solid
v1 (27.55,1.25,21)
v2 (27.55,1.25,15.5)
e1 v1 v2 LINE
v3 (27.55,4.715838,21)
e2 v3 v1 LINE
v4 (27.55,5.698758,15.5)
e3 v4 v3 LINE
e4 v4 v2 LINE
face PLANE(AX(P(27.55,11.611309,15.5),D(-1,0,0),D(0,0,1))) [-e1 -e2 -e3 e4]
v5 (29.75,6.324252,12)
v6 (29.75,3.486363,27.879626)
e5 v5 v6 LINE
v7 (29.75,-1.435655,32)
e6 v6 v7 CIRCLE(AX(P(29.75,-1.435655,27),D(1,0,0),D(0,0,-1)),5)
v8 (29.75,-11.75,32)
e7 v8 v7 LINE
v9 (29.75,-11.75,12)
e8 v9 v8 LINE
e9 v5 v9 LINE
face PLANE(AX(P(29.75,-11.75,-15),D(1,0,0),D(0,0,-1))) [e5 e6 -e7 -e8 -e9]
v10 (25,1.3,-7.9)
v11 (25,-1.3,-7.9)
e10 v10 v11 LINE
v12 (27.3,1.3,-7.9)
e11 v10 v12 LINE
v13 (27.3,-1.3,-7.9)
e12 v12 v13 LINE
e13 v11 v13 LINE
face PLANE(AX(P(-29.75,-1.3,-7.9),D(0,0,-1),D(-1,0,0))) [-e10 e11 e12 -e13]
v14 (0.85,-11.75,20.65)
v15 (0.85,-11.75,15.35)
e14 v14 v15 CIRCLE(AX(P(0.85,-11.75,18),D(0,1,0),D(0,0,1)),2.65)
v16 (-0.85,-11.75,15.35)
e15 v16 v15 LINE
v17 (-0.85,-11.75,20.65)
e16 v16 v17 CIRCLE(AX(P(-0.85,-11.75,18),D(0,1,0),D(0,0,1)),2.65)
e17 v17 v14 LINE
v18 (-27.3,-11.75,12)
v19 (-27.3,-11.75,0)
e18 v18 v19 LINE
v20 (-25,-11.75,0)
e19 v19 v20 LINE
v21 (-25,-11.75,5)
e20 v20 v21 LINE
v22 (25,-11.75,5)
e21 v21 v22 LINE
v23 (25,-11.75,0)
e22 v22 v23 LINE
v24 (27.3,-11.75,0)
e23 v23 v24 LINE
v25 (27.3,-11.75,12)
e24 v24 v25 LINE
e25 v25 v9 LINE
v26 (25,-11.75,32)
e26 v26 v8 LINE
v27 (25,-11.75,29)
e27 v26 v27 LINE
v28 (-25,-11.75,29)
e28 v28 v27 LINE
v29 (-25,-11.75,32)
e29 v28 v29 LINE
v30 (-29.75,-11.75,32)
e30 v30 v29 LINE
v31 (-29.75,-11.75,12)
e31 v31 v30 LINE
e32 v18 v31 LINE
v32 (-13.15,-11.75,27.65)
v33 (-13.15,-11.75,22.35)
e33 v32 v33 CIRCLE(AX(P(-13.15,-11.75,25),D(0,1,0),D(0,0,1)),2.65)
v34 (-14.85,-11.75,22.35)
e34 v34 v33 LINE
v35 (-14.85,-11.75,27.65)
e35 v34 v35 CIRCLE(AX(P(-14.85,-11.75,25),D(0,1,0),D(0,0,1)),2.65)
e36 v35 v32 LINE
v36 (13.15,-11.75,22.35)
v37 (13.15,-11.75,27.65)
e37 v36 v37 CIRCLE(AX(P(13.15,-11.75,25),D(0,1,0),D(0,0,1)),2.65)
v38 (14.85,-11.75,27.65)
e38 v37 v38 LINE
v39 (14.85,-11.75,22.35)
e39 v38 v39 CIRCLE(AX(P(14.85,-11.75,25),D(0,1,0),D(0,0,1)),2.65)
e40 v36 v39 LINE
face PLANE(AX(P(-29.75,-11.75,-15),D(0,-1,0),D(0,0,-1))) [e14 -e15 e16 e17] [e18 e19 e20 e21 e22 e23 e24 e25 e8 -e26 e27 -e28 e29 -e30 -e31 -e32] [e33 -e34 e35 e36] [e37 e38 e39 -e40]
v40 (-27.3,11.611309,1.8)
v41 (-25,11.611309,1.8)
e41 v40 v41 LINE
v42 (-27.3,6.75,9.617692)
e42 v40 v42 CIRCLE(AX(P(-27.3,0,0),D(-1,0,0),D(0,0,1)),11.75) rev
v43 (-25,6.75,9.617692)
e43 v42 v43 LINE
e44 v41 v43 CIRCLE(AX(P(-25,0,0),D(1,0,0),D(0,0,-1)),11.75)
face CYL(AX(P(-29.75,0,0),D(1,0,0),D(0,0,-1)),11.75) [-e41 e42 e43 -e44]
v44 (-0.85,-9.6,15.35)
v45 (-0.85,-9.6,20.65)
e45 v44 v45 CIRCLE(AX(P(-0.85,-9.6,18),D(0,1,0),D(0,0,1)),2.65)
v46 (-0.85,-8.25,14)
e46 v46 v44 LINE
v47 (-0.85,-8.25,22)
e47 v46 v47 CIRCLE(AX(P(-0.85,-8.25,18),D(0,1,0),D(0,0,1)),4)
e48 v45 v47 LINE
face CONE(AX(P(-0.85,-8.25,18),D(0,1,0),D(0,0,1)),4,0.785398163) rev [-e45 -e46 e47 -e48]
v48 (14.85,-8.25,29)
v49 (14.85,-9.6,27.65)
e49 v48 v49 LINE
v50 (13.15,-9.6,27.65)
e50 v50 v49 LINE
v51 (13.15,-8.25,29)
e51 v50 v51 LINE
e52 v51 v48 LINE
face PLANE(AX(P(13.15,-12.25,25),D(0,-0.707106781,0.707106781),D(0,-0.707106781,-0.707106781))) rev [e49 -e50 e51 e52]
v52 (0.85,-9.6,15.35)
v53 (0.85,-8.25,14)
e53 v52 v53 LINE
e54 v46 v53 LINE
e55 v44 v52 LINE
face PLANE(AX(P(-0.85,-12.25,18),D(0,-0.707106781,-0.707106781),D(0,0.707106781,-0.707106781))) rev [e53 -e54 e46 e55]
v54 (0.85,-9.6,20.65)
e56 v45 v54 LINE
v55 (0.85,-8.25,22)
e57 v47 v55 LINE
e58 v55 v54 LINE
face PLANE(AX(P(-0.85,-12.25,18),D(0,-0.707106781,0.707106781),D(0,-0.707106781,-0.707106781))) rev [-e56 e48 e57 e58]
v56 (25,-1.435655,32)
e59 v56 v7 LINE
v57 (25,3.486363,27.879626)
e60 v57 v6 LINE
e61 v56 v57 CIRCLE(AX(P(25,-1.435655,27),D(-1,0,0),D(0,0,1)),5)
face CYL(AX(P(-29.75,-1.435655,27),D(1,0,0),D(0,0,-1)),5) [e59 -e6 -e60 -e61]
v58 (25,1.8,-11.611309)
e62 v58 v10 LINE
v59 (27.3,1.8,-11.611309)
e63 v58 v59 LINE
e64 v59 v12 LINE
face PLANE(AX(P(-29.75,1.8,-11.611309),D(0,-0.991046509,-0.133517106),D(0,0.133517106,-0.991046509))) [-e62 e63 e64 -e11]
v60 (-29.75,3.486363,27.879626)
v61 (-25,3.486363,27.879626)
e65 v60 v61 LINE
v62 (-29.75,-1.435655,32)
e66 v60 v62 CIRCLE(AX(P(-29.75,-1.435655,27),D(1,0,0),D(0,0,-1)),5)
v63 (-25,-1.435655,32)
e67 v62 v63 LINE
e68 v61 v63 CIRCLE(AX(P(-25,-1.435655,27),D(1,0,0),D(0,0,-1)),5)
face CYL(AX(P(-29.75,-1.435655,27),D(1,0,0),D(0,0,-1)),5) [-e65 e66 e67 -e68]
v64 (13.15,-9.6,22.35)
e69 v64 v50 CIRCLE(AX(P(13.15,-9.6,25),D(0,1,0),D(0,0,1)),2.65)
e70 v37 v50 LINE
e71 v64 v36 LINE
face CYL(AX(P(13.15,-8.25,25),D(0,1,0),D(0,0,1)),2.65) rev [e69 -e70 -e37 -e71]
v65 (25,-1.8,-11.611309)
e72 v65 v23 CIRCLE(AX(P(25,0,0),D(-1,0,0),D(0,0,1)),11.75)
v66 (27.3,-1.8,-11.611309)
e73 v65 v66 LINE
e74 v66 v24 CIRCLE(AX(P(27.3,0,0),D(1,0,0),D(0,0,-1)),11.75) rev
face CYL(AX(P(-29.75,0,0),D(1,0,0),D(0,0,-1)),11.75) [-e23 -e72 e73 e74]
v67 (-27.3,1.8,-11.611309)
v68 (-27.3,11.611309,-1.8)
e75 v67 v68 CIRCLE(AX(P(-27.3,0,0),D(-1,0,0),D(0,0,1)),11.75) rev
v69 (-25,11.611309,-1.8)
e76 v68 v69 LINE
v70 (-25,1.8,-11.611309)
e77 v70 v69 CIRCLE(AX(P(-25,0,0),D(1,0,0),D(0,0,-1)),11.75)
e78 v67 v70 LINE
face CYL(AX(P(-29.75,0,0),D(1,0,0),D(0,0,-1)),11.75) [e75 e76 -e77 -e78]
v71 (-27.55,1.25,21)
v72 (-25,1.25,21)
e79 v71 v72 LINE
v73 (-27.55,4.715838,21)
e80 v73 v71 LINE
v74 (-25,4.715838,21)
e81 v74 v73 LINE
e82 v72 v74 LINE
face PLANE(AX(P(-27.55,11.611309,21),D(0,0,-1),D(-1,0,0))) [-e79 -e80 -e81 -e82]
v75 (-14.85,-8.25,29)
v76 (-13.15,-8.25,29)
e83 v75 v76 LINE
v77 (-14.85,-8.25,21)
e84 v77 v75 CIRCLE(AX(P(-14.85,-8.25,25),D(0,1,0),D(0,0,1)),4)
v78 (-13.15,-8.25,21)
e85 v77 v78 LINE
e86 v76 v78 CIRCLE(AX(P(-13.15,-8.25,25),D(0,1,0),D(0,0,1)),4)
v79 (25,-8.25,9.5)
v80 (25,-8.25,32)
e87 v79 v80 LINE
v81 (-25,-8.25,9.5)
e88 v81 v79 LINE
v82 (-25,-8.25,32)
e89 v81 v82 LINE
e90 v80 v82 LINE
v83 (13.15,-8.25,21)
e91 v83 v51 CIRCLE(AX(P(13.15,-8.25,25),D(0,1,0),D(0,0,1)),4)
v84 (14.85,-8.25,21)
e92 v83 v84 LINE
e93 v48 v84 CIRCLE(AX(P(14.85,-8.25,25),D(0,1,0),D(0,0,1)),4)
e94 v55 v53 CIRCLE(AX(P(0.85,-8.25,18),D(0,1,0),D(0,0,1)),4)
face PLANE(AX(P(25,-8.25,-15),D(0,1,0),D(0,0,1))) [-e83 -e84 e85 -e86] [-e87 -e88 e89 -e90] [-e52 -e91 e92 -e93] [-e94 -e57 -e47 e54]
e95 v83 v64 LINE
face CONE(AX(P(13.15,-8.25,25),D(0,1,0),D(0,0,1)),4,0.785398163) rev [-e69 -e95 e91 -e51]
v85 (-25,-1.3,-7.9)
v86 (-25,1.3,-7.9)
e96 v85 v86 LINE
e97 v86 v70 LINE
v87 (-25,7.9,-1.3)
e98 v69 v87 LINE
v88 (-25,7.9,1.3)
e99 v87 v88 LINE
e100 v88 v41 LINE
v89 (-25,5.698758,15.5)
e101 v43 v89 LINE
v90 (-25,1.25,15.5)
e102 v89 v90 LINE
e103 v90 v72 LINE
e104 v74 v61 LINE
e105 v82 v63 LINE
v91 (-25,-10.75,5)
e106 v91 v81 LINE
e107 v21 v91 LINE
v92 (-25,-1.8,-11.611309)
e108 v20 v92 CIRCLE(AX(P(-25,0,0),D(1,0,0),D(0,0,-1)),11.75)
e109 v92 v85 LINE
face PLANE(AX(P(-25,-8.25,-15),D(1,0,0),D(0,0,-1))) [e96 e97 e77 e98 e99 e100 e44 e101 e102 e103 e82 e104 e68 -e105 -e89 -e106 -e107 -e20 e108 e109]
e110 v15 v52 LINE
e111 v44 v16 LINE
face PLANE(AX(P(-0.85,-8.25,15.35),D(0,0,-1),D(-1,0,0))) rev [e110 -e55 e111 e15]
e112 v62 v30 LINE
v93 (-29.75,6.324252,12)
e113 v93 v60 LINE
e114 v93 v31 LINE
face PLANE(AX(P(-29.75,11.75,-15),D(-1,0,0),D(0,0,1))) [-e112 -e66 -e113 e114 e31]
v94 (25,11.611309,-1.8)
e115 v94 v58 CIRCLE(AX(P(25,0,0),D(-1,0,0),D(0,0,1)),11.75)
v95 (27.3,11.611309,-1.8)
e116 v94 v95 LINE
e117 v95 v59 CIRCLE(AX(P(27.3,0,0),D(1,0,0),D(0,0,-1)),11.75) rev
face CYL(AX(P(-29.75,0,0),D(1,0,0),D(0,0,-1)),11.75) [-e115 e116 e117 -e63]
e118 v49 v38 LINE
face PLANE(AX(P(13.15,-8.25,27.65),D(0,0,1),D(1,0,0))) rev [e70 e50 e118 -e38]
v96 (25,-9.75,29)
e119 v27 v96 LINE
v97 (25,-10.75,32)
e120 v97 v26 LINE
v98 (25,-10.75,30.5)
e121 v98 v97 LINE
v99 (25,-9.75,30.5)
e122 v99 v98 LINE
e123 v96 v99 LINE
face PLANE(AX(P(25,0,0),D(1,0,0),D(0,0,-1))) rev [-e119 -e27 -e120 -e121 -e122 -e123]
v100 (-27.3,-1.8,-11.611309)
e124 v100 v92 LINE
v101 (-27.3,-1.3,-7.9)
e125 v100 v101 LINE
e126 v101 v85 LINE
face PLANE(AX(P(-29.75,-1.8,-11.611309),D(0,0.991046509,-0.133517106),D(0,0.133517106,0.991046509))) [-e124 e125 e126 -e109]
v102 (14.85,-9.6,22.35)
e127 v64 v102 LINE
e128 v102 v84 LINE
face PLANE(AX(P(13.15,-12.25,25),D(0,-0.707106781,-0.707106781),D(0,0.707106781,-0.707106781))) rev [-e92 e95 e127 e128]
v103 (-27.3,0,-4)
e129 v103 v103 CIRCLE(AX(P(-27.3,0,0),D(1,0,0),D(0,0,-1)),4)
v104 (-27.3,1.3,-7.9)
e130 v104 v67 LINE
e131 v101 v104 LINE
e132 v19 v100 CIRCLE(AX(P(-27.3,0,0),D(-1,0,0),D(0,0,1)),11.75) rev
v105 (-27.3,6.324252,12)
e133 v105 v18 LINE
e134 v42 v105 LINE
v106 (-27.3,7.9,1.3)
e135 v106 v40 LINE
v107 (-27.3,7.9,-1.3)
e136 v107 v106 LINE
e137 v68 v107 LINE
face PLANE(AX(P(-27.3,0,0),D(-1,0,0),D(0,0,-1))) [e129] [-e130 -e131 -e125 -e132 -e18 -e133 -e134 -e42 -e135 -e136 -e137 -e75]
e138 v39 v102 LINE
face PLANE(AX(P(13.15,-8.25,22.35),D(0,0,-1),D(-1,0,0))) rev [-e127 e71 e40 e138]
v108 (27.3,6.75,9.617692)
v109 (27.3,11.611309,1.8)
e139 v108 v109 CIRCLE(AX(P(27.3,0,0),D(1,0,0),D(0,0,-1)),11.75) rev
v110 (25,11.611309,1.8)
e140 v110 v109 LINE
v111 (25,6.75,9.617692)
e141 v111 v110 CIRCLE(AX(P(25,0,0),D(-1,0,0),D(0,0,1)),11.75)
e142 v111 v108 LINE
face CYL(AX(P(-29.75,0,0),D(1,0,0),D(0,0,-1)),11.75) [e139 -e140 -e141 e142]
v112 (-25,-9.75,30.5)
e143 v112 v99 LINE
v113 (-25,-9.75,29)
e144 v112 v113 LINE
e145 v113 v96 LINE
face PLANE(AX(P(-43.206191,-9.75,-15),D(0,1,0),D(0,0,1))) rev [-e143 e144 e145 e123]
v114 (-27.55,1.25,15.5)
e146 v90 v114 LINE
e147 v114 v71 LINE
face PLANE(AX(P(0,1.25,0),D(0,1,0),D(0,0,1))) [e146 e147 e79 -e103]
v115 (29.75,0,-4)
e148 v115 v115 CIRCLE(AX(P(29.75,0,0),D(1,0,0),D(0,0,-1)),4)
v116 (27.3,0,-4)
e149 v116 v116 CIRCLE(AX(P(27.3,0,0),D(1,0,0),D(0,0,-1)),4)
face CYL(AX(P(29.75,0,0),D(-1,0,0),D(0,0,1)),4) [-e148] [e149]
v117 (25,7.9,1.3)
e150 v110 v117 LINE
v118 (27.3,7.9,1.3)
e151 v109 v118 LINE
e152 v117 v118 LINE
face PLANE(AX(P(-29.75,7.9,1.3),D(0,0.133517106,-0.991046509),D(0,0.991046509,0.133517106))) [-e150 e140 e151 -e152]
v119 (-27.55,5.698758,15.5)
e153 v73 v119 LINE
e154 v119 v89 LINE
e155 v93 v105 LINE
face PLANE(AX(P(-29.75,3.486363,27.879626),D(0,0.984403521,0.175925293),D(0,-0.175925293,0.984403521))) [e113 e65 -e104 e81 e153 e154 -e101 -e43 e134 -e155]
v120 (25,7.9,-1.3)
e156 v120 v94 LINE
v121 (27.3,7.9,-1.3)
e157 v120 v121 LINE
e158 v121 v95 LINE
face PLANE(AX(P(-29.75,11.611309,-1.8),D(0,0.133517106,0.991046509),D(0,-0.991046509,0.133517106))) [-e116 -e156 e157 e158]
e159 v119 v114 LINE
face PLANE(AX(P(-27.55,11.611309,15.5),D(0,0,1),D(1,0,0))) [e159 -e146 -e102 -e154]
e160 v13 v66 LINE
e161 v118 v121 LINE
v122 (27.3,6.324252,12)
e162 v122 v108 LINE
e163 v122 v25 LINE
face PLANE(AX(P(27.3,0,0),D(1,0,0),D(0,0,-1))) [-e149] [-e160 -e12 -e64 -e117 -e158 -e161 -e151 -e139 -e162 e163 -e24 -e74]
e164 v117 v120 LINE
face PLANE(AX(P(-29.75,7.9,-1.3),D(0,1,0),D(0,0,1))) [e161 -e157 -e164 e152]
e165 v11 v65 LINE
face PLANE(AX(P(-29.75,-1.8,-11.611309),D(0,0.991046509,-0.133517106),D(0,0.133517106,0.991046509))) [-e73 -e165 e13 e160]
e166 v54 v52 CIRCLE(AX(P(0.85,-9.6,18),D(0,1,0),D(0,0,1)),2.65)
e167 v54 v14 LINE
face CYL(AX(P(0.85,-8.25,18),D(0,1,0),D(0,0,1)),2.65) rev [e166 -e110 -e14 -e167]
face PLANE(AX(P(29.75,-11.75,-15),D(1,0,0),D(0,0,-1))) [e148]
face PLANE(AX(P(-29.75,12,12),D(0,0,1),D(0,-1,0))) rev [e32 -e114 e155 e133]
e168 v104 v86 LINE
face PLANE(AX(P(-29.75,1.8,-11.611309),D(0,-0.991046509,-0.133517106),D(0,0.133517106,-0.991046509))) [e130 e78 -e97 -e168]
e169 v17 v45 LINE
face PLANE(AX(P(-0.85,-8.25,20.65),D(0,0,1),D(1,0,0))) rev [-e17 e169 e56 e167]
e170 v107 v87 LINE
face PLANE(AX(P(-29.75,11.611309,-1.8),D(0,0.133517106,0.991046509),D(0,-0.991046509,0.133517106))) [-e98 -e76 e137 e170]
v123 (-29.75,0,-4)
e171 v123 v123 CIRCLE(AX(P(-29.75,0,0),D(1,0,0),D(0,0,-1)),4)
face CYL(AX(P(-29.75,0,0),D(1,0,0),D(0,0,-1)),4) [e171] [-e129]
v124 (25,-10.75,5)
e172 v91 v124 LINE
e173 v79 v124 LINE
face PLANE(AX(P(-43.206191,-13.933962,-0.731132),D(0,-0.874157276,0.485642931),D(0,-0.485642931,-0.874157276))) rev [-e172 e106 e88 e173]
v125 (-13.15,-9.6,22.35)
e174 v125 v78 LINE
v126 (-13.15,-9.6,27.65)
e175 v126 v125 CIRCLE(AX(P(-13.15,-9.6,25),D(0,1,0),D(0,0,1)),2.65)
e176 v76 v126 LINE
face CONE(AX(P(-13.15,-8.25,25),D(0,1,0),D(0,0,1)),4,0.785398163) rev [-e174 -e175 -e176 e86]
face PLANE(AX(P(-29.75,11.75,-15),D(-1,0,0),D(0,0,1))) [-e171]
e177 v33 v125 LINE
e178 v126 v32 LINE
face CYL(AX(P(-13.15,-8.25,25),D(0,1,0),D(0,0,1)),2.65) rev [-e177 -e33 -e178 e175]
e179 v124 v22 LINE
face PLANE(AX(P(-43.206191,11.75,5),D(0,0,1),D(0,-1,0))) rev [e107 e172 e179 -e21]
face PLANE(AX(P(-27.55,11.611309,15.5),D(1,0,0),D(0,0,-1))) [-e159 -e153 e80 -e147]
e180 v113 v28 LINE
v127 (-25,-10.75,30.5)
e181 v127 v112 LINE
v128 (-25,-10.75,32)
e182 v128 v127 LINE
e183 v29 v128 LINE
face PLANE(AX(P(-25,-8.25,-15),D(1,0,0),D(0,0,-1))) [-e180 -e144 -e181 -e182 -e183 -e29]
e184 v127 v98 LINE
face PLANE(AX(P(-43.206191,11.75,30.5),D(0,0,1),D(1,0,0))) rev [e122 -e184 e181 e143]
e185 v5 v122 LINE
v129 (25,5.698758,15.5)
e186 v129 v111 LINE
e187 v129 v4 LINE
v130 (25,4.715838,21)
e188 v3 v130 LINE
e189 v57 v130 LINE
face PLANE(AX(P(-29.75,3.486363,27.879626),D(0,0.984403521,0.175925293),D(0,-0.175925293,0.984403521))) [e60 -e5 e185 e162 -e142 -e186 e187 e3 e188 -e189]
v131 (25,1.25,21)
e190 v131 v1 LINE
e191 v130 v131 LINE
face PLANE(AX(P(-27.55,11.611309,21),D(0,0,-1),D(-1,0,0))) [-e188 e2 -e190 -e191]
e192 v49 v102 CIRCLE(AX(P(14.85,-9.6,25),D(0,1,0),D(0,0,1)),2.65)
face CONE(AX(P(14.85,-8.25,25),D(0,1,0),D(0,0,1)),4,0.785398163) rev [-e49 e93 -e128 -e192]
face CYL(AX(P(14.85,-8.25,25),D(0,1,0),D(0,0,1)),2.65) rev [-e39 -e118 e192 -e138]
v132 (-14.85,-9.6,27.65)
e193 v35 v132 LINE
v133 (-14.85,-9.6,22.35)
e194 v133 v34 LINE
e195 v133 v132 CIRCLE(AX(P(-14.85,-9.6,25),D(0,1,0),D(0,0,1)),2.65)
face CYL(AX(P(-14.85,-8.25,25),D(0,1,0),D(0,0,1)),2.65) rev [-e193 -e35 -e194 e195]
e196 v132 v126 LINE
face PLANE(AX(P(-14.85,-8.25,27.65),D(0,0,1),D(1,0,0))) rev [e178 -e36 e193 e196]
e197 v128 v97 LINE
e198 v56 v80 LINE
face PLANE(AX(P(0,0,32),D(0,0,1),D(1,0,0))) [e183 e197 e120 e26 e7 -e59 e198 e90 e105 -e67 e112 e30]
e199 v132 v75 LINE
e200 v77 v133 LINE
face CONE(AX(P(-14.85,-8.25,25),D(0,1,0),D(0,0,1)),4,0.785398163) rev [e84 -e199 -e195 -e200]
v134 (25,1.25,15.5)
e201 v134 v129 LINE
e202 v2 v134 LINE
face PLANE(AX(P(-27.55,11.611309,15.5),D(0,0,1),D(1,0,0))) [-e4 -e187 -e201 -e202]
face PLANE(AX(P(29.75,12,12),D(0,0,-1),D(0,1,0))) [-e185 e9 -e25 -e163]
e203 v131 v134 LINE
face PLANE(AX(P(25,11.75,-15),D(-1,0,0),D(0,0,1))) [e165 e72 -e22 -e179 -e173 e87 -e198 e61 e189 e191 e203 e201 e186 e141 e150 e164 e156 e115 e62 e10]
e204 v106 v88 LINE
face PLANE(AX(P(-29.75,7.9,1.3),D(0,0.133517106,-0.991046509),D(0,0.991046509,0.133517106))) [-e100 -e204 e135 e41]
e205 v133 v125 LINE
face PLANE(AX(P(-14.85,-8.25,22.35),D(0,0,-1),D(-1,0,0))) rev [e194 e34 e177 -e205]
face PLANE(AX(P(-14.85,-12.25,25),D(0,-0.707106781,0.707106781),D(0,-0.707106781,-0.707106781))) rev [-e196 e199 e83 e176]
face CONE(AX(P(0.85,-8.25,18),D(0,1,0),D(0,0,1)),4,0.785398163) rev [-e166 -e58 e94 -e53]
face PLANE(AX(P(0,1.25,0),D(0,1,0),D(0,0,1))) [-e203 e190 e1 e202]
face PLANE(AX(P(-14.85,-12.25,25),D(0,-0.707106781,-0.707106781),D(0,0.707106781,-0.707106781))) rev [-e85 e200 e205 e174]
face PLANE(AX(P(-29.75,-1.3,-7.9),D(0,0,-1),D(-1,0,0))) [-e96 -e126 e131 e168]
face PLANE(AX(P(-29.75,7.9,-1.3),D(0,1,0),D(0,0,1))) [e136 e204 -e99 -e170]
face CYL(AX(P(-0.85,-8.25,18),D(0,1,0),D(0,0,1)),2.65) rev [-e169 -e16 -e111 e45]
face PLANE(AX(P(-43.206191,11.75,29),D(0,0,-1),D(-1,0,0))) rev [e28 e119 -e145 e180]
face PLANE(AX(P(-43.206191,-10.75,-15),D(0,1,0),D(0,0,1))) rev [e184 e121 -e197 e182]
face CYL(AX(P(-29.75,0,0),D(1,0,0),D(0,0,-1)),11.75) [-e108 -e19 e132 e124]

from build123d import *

# Parameters (mm, degrees)
BODY_DEPTH                       = 32
BODY_DEPTH_BACK                  = 15
PIVOT_START                      = 25
PIVOT_PIN_R_SKETCH_R             = 4
PIVOT_PIN_R_DEPTH                = 4.25
OUTSIDE_SHAPE_CUT_OUT_DEPTH      = 46.245165488
OUTSIDE_SHAPE_CUT_OUT_DEPTH_BACK = 46.245165488
OUTSIDE_SHAPE_CUT_OUT_SKETCH_W   = 49
OUTSIDE_SHAPE_CUT_OUT_SKETCH_H   = 25.5
OUTSIDE_START                    = 27.3
OUTSIDE_SHAPE_CUT_OUT_SKETCH_R_W = 24
OUTSIDE_SHAPE_CUT_OUT_SKETCH_R_H = 24
OUTSIDE_SHAPE_CUT_OUT_SKETCH_R_R = 4
OUTSIDE_SHAPE_CUT_OUT_R_DEPTH    = 18.945165488
INSIDE_START                     = 25
INSIDE_SHAPE_CUT_OUT_DEPTH       = 50
LIGHTENING_START                 = 1.25
LIGHTENING_2_SKETCH_W            = 55.1
LIGHTENING_2_SKETCH_H            = 5.5
LIGHTENING_2_DEPTH               = 44.995165488
F_3_START                        = -11.75
F_3_M5_SLOTS_DEPTH               = 3.5


with BuildPart() as part:
    # Profile Sketch → Body (new, two sides: drawn at the far end of the back side and taken through both)
    with BuildSketch(Plane.XY.offset(-BODY_DEPTH_BACK)):
        Polygon((-29.75, -11.75), (29.75, -11.75), (29.75, 11.75), (25, 11.75), (25, -8.25), (-25, -8.25), (-25, 11.75), (-29.75, 11.75), align=None)
    extrude(amount=BODY_DEPTH + BODY_DEPTH_BACK)

    # Pivot Pin R Sketch → Pivot Pin R (add)
    with BuildSketch(Plane(origin=(0, 0, 0), x_dir=(0, 0, -1), z_dir=(1, 0, 0)).offset(PIVOT_START)):
        Circle(PIVOT_PIN_R_SKETCH_R)
    pivot_pin_r = extrude(amount=PIVOT_PIN_R_DEPTH)

    # Pivot Pin L: Pivot Pin R across plane
    add(pivot_pin_r.mirror(Plane(origin=(0, 0, 0), x_dir=(0, 0, 1), z_dir=(1, 0, 0))))

    # Outside Shape Cut Out Sketch → Outside Shape Cut Out (cut, two sides: drawn at the far end of the back side and taken through both)
    with BuildSketch(Plane(origin=(0, 0, 0), x_dir=(0, 0, -1), z_dir=(1, 0, 0)).offset(-OUTSIDE_SHAPE_CUT_OUT_DEPTH_BACK)):
        with Locations((-9.5, -1)):
            Rectangle(OUTSIDE_SHAPE_CUT_OUT_SKETCH_W, OUTSIDE_SHAPE_CUT_OUT_SKETCH_H)
        with BuildLine():
            Line((-27.879626464, 3.486362585), (-9.617692031, 6.75))
            ThreePointArc((-9.617692031, 6.75), (-6.204756601, 9.978150907), (-1.8, 11.611309142))
            Line((-1.8, 11.611309142), (-1.3, 7.9))
            Line((-1.3, 7.9), (1.3, 7.9))
            Line((1.3, 7.9), (1.8, 11.611309142))
            ThreePointArc((1.8, 11.611309142), (8.308504679, 8.308504679), (11.611309142, 1.8))
            Line((11.611309142, 1.8), (7.9, 1.3))
            Line((7.9, 1.3), (7.9, -1.3))
            Line((7.9, -1.3), (11.611309142, -1.8))
            ThreePointArc((11.611309142, -1.8), (7.645668708, -8.922233465), (0, -11.75))
            Line((0, -11.75), (-32, -11.75))
            Line((-32, -11.75), (-32, -1.435655018))
            ThreePointArc((-32, -1.435655018), (-30.833936118, 1.773851772), (-27.879626464, 3.486362585))
        make_face(mode=Mode.SUBTRACT)
    extrude(amount=OUTSIDE_SHAPE_CUT_OUT_DEPTH + OUTSIDE_SHAPE_CUT_OUT_DEPTH_BACK, mode=Mode.SUBTRACT)

    # Outside Shape Cut Out Sketch R → Outside Shape Cut Out R (cut, through all)
    with BuildSketch(Plane(origin=(0, 0, 0), x_dir=(0, 0, -1), z_dir=(1, 0, 0)).offset(OUTSIDE_START)):
        Rectangle(OUTSIDE_SHAPE_CUT_OUT_SKETCH_R_W, OUTSIDE_SHAPE_CUT_OUT_SKETCH_R_H)
        Circle(OUTSIDE_SHAPE_CUT_OUT_SKETCH_R_R, mode=Mode.SUBTRACT)
    outside_shape_cut_out_r = extrude(amount=OUTSIDE_SHAPE_CUT_OUT_R_DEPTH, mode=Mode.SUBTRACT)

    # Outside Shape Cut Out L: Outside Shape Cut Out R across plane
    add(outside_shape_cut_out_r.mirror(Plane(origin=(0, 0, 0), x_dir=(0, 0, 1), z_dir=(1, 0, 0))), mode=Mode.SUBTRACT)

    # Inside Shape Cut Out Sketch → Inside Shape Cut Out (cut)
    with BuildSketch(Plane(origin=(0, 0, 0), x_dir=(0, 0, -1), z_dir=(1, 0, 0)).offset(INSIDE_START)):
        Polygon((-29, -9.75), (-29, -11.75), (-32, -11.75), (-32, -10.75), (-30.5, -10.75), (-30.5, -9.75), align=None)
        Polygon((-9.5, -8.25), (-5, -10.75), (-5, -11.75), (8.366600265, -11.75), (8.366600265, -8.25), align=None)
    extrude(amount=-INSIDE_SHAPE_CUT_OUT_DEPTH, mode=Mode.SUBTRACT)

    # Lightening 2 Sketch → Lightening 2 (cut, through all)
    with BuildSketch(Plane(origin=(0, 0, 0), x_dir=(1, 0, 0), z_dir=(0, 1, 0)).offset(LIGHTENING_START)):
        with Locations((0, -18.25)):
            Rectangle(LIGHTENING_2_SKETCH_W, LIGHTENING_2_SKETCH_H)
    extrude(amount=LIGHTENING_2_DEPTH, mode=Mode.SUBTRACT)

    # 3 M5 Slots: read off the stored shape, not the designer's step
    # 3 M5 Slots outline → 3 M5 Slots (cut)
    with BuildSketch(Plane(origin=(0, 0, 0), x_dir=(1, 0, 0), z_dir=(0, 1, 0)).offset(F_3_START)):
        with BuildLine():
            Line((-0.85, -20.65), (0.85, -20.65))
            ThreePointArc((0.85, -20.65), (3.5, -18), (0.85, -15.35))
            Line((0.85, -15.35), (-0.85, -15.35))
            ThreePointArc((-0.85, -15.35), (-3.5, -18), (-0.85, -20.65))
        make_face()
        with BuildLine():
            Line((13.15, -27.65), (14.85, -27.65))
            ThreePointArc((14.85, -27.65), (17.5, -25), (14.85, -22.35))
            Line((14.85, -22.35), (13.15, -22.35))
            ThreePointArc((13.15, -22.35), (10.5, -25), (13.15, -27.65))
        make_face()
        with BuildLine():
            ThreePointArc((-13.15, -27.65), (-10.5, -25), (-13.15, -22.35))
            Line((-13.15, -22.35), (-14.85, -22.35))
            ThreePointArc((-14.85, -22.35), (-17.5, -25), (-14.85, -27.65))
            Line((-14.85, -27.65), (-13.15, -27.65))
        make_face()
    extrude(amount=F_3_M5_SLOTS_DEPTH, mode=Mode.SUBTRACT)

    # 3 M5 Slots 2: loft between two sections, ruled curve by curve
    f_3_m5_slots_2_from = [
        Edge.make_three_point_arc((0.85, -9.6, 20.65), (2.72383297, -9.6, 19.87383297), (3.5, -9.6, 18)),
        Edge.make_three_point_arc((3.5, -9.6, 18), (2.72383297, -9.6, 16.12616703), (0.85, -9.6, 15.35)),
        Edge.make_three_point_arc((-0.85, -9.6, 15.35), (-2.72383297, -9.6, 16.12616703), (-3.5, -9.6, 18)),
        Edge.make_three_point_arc((-3.5, -9.6, 18), (-2.72383297, -9.6, 19.87383297), (-0.85, -9.6, 20.65)),
        Edge.make_line((0.85, -9.6, 15.35), (-0.85, -9.6, 15.35)),
        Edge.make_line((0.85, -9.6, 20.65), (-0.85, -9.6, 20.65)),
    ]
    f_3_m5_slots_2_to = [
        Edge.make_three_point_arc((0.85, -8.25, 22), (3.678427125, -8.25, 20.828427125), (4.85, -8.25, 18)),
        Edge.make_three_point_arc((4.85, -8.25, 18), (3.678427125, -8.25, 15.171572875), (0.85, -8.25, 14)),
        Edge.make_three_point_arc((-0.85, -8.25, 14), (-3.678427125, -8.25, 15.171572875), (-4.85, -8.25, 18)),
        Edge.make_three_point_arc((-4.85, -8.25, 18), (-3.678427125, -8.25, 20.828427125), (-0.85, -8.25, 22)),
        Edge.make_line((0.85, -8.25, 14), (-0.85, -8.25, 14)),
        Edge.make_line((0.85, -8.25, 22), (-0.85, -8.25, 22)),
    ]
    f_3_m5_slots_2 = Solid(Shell([*[Face.make_surface_from_curves(f_3_m5_slots_2_from[k], f_3_m5_slots_2_to[k]) for k in range(6)], Face(Wire(f_3_m5_slots_2_from)), Face(Wire(f_3_m5_slots_2_to))]))
    add(f_3_m5_slots_2, mode=Mode.SUBTRACT)

    # 3 M5 Slots 3: loft between two sections, ruled curve by curve
    f_3_m5_slots_3_from = [
        Edge.make_three_point_arc((14.85, -9.6, 27.65), (16.72383297, -9.6, 26.87383297), (17.5, -9.6, 25)),
        Edge.make_three_point_arc((17.5, -9.6, 25), (16.72383297, -9.6, 23.12616703), (14.85, -9.6, 22.35)),
        Edge.make_three_point_arc((13.15, -9.6, 22.35), (11.27616703, -9.6, 23.12616703), (10.5, -9.6, 25)),
        Edge.make_three_point_arc((10.5, -9.6, 25), (11.27616703, -9.6, 26.87383297), (13.15, -9.6, 27.65)),
        Edge.make_line((14.85, -9.6, 22.35), (13.15, -9.6, 22.35)),
        Edge.make_line((14.85, -9.6, 27.65), (13.15, -9.6, 27.65)),
    ]
    f_3_m5_slots_3_to = [
        Edge.make_three_point_arc((14.85, -8.25, 29), (17.678427125, -8.25, 27.828427125), (18.85, -8.25, 25)),
        Edge.make_three_point_arc((18.85, -8.25, 25), (17.678427125, -8.25, 22.171572875), (14.85, -8.25, 21)),
        Edge.make_three_point_arc((13.15, -8.25, 21), (10.321572875, -8.25, 22.171572875), (9.15, -8.25, 25)),
        Edge.make_three_point_arc((9.15, -8.25, 25), (10.321572875, -8.25, 27.828427125), (13.15, -8.25, 29)),
        Edge.make_line((14.85, -8.25, 21), (13.15, -8.25, 21)),
        Edge.make_line((14.85, -8.25, 29), (13.15, -8.25, 29)),
    ]
    f_3_m5_slots_3 = Solid(Shell([*[Face.make_surface_from_curves(f_3_m5_slots_3_from[k], f_3_m5_slots_3_to[k]) for k in range(6)], Face(Wire(f_3_m5_slots_3_from)), Face(Wire(f_3_m5_slots_3_to))]))
    add(f_3_m5_slots_3, mode=Mode.SUBTRACT)

    # 3 M5 Slots 4: loft between two sections, ruled curve by curve
    f_3_m5_slots_4_from = [
        Edge.make_three_point_arc((-13.15, -9.6, 27.65), (-11.27616703, -9.6, 26.87383297), (-10.5, -9.6, 25)),
        Edge.make_three_point_arc((-10.5, -9.6, 25), (-11.27616703, -9.6, 23.12616703), (-13.15, -9.6, 22.35)),
        Edge.make_three_point_arc((-14.85, -9.6, 22.35), (-16.72383297, -9.6, 23.12616703), (-17.5, -9.6, 25)),
        Edge.make_three_point_arc((-17.5, -9.6, 25), (-16.72383297, -9.6, 26.87383297), (-14.85, -9.6, 27.65)),
        Edge.make_line((-13.15, -9.6, 22.35), (-14.85, -9.6, 22.35)),
        Edge.make_line((-13.15, -9.6, 27.65), (-14.85, -9.6, 27.65)),
    ]
    f_3_m5_slots_4_to = [
        Edge.make_three_point_arc((-13.15, -8.25, 29), (-10.321572875, -8.25, 27.828427125), (-9.15, -8.25, 25)),
        Edge.make_three_point_arc((-9.15, -8.25, 25), (-10.321572875, -8.25, 22.171572875), (-13.15, -8.25, 21)),
        Edge.make_three_point_arc((-14.85, -8.25, 21), (-17.678427125, -8.25, 22.171572875), (-18.85, -8.25, 25)),
        Edge.make_three_point_arc((-18.85, -8.25, 25), (-17.678427125, -8.25, 27.828427125), (-14.85, -8.25, 29)),
        Edge.make_line((-13.15, -8.25, 21), (-14.85, -8.25, 21)),
        Edge.make_line((-13.15, -8.25, 29), (-14.85, -8.25, 29)),
    ]
    f_3_m5_slots_4 = Solid(Shell([*[Face.make_surface_from_curves(f_3_m5_slots_4_from[k], f_3_m5_slots_4_to[k]) for k in range(6)], Face(Wire(f_3_m5_slots_4_from)), Face(Wire(f_3_m5_slots_4_to))]))
    add(f_3_m5_slots_4, mode=Mode.SUBTRACT)


solid = part.part
